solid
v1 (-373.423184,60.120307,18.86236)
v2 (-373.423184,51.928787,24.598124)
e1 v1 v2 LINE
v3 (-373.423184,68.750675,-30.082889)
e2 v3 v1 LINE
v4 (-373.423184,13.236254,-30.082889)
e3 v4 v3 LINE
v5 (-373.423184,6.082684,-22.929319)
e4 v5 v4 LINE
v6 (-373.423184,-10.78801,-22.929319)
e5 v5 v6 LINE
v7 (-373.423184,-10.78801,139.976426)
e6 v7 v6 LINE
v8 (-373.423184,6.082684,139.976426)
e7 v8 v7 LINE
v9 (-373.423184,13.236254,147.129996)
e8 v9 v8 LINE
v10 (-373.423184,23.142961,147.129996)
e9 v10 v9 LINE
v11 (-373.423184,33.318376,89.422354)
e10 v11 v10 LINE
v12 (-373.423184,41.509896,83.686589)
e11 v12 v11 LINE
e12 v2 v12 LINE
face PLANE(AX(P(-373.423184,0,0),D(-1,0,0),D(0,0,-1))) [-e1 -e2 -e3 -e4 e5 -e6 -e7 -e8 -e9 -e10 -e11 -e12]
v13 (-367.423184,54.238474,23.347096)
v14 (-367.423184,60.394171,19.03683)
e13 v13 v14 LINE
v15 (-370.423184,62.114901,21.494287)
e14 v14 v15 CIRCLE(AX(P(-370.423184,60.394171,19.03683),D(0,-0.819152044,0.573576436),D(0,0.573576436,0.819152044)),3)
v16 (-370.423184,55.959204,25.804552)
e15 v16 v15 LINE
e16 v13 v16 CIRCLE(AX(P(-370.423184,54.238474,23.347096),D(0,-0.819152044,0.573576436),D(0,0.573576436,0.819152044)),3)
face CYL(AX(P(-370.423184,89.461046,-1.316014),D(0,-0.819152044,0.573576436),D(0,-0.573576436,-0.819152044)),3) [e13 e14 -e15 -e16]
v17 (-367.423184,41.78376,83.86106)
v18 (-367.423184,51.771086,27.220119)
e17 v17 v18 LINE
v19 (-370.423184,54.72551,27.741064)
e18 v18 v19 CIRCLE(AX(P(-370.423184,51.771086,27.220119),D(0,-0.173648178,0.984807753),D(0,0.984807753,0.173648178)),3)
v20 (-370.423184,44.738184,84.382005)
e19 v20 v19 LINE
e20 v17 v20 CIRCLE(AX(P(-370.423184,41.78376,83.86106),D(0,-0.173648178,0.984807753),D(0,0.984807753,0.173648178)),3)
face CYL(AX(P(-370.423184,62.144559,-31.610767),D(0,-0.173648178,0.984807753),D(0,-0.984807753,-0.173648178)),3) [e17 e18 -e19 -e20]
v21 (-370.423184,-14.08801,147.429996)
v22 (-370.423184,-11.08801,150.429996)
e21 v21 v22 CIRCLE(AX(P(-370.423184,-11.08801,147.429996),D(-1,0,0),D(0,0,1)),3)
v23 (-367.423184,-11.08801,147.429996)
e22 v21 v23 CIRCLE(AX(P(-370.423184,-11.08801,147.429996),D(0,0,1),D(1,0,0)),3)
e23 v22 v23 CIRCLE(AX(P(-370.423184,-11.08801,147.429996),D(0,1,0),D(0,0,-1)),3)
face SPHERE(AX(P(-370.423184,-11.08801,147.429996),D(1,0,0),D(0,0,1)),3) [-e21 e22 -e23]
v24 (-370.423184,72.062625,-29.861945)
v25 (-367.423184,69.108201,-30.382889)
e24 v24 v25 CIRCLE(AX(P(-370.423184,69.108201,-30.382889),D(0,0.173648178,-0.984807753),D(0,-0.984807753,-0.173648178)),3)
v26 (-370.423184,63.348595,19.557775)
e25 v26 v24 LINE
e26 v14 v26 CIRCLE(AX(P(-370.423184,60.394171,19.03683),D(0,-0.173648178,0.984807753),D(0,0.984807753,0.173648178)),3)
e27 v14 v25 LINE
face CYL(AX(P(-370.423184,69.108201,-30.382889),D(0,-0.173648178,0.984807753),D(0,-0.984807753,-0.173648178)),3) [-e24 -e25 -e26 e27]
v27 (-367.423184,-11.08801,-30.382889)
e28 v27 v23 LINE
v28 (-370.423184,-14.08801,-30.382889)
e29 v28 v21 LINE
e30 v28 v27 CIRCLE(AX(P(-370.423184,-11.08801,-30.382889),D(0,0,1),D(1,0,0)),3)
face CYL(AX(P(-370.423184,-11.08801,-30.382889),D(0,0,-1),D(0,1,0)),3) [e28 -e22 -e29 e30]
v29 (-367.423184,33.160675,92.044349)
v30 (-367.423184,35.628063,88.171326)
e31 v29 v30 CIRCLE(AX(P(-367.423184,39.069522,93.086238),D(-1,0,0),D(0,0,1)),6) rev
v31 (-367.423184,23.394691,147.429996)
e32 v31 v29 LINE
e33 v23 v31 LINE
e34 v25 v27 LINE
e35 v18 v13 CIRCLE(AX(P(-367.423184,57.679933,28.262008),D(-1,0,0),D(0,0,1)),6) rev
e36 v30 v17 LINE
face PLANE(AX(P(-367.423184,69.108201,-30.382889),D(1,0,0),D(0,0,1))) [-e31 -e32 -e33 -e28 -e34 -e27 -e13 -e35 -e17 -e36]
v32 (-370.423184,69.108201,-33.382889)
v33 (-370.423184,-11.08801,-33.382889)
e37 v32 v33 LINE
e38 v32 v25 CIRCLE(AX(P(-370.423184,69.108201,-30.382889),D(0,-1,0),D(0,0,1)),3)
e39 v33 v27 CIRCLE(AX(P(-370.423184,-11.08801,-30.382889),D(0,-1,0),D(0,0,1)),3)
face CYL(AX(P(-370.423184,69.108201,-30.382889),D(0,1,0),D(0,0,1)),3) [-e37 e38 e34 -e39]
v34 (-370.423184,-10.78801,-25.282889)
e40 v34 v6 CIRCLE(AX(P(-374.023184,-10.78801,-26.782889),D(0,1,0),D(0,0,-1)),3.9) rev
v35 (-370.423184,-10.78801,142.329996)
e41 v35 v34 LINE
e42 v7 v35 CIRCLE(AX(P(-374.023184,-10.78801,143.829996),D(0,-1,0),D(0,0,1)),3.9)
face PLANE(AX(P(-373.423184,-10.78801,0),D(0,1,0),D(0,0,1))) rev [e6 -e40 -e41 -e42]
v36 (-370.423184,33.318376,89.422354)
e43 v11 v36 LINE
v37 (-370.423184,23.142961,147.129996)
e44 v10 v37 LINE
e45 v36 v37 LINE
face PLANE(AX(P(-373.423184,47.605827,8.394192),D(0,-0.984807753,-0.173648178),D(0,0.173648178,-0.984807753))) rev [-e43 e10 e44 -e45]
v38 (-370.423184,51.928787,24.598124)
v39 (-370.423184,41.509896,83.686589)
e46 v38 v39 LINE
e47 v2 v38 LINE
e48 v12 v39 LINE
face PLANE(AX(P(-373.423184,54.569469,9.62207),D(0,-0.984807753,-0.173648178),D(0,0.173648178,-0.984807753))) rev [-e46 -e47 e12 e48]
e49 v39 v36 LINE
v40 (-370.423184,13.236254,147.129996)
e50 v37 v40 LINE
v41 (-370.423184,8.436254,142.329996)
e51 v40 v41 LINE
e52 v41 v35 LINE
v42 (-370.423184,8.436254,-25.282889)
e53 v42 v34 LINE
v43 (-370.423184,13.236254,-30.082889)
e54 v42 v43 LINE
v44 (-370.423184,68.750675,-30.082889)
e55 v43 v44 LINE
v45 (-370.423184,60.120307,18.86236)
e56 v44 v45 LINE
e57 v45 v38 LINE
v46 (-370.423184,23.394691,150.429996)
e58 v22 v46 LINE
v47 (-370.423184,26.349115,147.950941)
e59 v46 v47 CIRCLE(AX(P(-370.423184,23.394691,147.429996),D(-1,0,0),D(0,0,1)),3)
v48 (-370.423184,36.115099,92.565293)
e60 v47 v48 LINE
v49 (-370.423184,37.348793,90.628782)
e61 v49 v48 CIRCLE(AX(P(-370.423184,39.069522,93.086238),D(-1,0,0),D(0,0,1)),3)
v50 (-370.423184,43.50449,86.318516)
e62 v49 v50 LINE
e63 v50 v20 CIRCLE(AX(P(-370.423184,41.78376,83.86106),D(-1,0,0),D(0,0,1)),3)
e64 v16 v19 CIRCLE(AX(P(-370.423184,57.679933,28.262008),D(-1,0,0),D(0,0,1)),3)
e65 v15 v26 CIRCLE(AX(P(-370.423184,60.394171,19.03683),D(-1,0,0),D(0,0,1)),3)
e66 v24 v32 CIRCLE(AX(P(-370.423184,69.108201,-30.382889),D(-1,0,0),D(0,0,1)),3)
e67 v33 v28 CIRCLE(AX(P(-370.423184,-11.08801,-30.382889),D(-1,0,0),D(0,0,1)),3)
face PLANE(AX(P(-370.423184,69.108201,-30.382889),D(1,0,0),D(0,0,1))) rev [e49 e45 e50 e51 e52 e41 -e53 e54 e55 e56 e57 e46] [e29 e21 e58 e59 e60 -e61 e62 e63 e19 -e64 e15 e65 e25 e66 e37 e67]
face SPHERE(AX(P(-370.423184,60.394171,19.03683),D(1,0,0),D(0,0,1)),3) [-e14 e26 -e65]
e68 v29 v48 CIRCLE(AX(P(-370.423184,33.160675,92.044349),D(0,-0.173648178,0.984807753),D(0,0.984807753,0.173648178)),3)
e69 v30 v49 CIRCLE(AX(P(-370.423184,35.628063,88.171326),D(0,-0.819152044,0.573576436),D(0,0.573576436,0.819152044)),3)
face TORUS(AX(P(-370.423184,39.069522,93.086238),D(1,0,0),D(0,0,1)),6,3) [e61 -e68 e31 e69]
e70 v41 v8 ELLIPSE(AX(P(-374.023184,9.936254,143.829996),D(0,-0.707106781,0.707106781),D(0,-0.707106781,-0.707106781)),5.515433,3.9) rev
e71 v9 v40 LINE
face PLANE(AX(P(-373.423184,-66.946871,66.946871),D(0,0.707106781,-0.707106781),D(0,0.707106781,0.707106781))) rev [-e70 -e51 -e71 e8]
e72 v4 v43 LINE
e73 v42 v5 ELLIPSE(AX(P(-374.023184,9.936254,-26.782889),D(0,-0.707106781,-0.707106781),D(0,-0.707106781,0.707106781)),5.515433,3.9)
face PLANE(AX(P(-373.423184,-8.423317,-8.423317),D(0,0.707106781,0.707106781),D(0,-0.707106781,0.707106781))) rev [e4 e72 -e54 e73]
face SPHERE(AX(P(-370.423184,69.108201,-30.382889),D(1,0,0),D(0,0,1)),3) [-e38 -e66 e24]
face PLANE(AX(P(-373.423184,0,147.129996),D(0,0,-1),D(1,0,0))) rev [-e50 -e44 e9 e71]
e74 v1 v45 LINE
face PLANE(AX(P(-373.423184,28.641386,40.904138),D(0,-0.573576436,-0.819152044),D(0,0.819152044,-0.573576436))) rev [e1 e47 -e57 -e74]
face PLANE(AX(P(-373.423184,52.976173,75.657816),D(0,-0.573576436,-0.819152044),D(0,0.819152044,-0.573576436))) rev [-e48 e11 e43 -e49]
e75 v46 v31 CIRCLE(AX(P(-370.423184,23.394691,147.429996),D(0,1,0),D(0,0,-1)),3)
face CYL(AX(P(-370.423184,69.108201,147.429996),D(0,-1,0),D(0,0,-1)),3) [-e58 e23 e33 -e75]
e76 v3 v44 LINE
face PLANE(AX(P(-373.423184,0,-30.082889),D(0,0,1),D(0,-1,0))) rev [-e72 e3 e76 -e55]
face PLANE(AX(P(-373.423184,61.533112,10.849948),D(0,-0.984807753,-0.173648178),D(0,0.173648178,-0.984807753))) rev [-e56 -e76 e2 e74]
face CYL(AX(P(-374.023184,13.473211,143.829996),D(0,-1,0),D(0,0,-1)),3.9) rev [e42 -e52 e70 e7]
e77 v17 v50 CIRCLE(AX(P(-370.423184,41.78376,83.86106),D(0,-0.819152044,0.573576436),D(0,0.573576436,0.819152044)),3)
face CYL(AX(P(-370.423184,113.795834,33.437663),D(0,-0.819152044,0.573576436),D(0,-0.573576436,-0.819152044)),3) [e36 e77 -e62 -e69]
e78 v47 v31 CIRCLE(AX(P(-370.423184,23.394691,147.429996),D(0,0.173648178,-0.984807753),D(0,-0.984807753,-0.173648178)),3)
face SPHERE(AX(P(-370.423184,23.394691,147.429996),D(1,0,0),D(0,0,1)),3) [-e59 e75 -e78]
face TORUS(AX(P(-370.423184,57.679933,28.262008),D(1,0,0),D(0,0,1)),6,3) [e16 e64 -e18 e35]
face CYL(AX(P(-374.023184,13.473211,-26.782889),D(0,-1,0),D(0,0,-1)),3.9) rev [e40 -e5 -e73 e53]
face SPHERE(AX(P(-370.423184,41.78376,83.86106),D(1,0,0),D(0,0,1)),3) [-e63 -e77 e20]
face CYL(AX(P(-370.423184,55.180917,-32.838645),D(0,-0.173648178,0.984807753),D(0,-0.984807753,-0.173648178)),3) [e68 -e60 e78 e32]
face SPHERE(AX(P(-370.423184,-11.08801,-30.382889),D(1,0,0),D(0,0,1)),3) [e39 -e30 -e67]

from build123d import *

# Parameters (mm, degrees)
BOSS_EXTRUDE1_DEPTH  = 3
FILLET1_R            = 3
BOSS_EXTRUDE2_DEPTH  = 3
CUT_EXTRUDE1_START   = -16.870694295
CUT_EXTRUDE1_DEPTH   = 17.870694295
CUT_EXTRUDE1_START_2 = 6.082684495
CUT_EXTRUDE1_2_DEPTH = 3.553569774
CUT_EXTRUDE1_START_3 = -94.677172909
CUT_EXTRUDE1_3_DEPTH = 3.677172909
CUT_EXTRUDE2_REACH   = 418.489


with BuildPart() as part:
    # Sketch1 → Boss-Extrude1 (new body)
    with BuildSketch(Plane.ZY.offset(376.423184311)):
        with BuildLine():
            Line((-33.382889261, -4.0880098), (-33.382889261, -11.0880098))
            ThreePointArc((-33.382889261, -11.0880098), (-32.504209605, -13.209330144), (-30.382889261, -14.0880098))
            Line((-30.382889261, -14.0880098), (147.429996243, -14.0880098))
            ThreePointArc((147.429996243, -14.0880098), (149.551316587, -13.209330144), (150.429996243, -11.0880098))
            Line((150.429996243, -11.0880098), (150.429996243, -4.0880098))
            Line((150.429996243, -4.0880098), (150.429996243, 23.394691306))
            ThreePointArc((150.429996243, 23.394691306), (149.728129572, 25.323054136), (147.950940776, 26.349114566))
            Line((147.950940776, 26.349114566), (92.565293245, 36.115098569))
            ThreePointArc((92.565293245, 36.115098569), (91.474338953, 36.539347491), (90.628781645, 37.348792519))
            Line((90.628781645, 37.348792519), (86.318516116, 43.504489644))
            ThreePointArc((86.318516116, 43.504489644), (85.472958808, 44.313934672), (84.382004516, 44.738183594))
            Line((84.382004516, 44.738183594), (27.741063701, 54.725509672))
            ThreePointArc((27.741063701, 54.725509672), (26.650109409, 55.149758594), (25.804552101, 55.959203622))
            Line((25.804552101, 55.959203622), (21.494286572, 62.114900747))
            ThreePointArc((21.494286572, 62.114900747), (20.648729264, 62.924345775), (19.557774972, 63.348594697))
            Line((19.557774972, 63.348594697), (-29.861944728, 72.062624659))
            ThreePointArc((-29.861944728, 72.062624659), (-32.31125209, 71.406334729), (-33.382889261, 69.1082014))
            Line((-33.382889261, 69.1082014), (-33.382889261, -4.0880098))
        make_face()
    extrude(amount=BOSS_EXTRUDE1_DEPTH)

    # Fillet1
    fillet1_edges = [part.edges().sort_by_distance(p)[0] for p in [
        (-379.423184311, 67.705609678, -5.152084878),
        (-379.423184311, 62.924345775, 20.648729264),
        (-379.423184311, 59.037052184, 23.649419336),
        (-379.423184311, 55.149758594, 26.650109409),
        (-379.423184311, 49.731846633, 56.061534109),
        (-379.423184311, 44.313934672, 85.472958808),
        (-379.423184311, 40.426641081, 88.473648881),
        (-379.423184311, 36.539347491, 91.474338953),
        (-379.423184311, 31.232106567, 120.258117011),
        (-379.423184311, 25.323054136, 149.728129572),
        (-379.423184311, 6.153340753, 150.429996243),
        (-379.423184311, -13.209330144, 149.551316587),
        (-379.423184311, -14.0880098, 58.523553491),
        (-379.423184311, -13.209330144, -32.504209605),
        (-379.423184311, 29.0100958, -33.382889261),
        (-379.423184311, 71.406334729, -32.31125209),
    ]]
    fillet(fillet1_edges, radius=FILLET1_R - 0.0001)  # a hair under: the kernel refuses the full size

    # Sketch2 → Boss-Extrude2 (add)
    with BuildSketch(Plane(origin=(-376.423184311, 0, 0), x_dir=(0, 0, -1), z_dir=(1, 0, 0))):
        Polygon((-147.129996243, 23.142961417), (-147.129996243, 13.236254269), (-143.529996243, 9.636254269), (-143.529996243, -4.0880098), (-143.529996243, -10.7880098), (26.482889261, -10.7880098), (26.482889261, -4.0880098), (26.482889261, 9.636254269), (30.082889261, 13.236254269), (30.082889261, 68.750675322), (-18.862359767, 60.120307341), (-24.598124131, 51.928786898), (-83.686589311, 41.509896238), (-89.422353675, 33.318375795), align=None)
    extrude(amount=BOSS_EXTRUDE2_DEPTH)

    # Cut-Extrude1: read off the stored shape, not the designer's step
    # Cut-Extrude1 outline → Cut-Extrude1 (cut)
    with BuildSketch(Plane.XZ.offset(10.7880098).offset(CUT_EXTRUDE1_START)):
        with BuildLine():
            Line((-376.423184311, 143.529996243), (-376.423184311, 142.329996243))
            ThreePointArc((-376.423184311, 142.329996243), (-375.230428102, 140.761580148), (-373.423184311, 139.97642647))
            Line((-373.423184311, 139.97642647), (-373.423184311, 143.529996243))
            Line((-373.423184311, 143.529996243), (-376.423184311, 143.529996243))
        make_face()
    extrude(amount=CUT_EXTRUDE1_DEPTH, mode=Mode.SUBTRACT)

    # Cut-Extrude1 2 outline → Cut-Extrude1 2 (cut)
    with BuildSketch(Plane(origin=(0, 0, 0), x_dir=(1, 0, 0), z_dir=(0, 1, 0)).offset(CUT_EXTRUDE1_START_2)):
        with BuildLine():
            ThreePointArc((-373.423184311, -139.97642647), (-375.230428102, -140.761580148), (-376.423184311, -142.329996243))
            Line((-376.423184311, -142.329996243), (-376.423184311, -143.529996243))
            Line((-376.423184311, -143.529996243), (-373.423184311, -143.529996243))
            Line((-373.423184311, -143.529996243), (-373.423184311, -139.97642647))
        make_face()
    extrude(amount=CUT_EXTRUDE1_2_DEPTH, mode=Mode.SUBTRACT)

    # Cut-Extrude1 3 outline → Cut-Extrude1 3 (add)
    with BuildSketch(Plane(origin=(0, 0, 0), x_dir=(1, 0, 0), z_dir=(0, 0.707106781186553, -0.707106781186542)).offset(CUT_EXTRUDE1_START_3)):
        with BuildLine():
            Line((-376.423184311, -106.607838111), (-376.423184311, -113.39606321))
            Line((-376.423184311, -113.39606321), (-373.423184311, -113.39606321))
            Line((-373.423184311, -113.39606321), (-373.423184311, -103.279387817))
            add(Edge.make_bspline(
                [(-373.423184311, -103.279387817), (-375.582623677, -103.754880716), (-376.423184311, -106.607838111)],
                knots=[0.154459598, 0.154459598, 0.154459598, 1.176005207, 1.176005207, 1.176005207], degree=2, weights=[1, 0.872366982, 1]))
        make_face()
    extrude(amount=CUT_EXTRUDE1_3_DEPTH)

    # Cut-Extrude2: up to this plane
    cut_extrude2_end = Plane(origin=(-373.423184311, -8.423317496, -8.423317496), z_dir=(0, 0.7071067811865445, 0.7071067811865507))
    # Sketch3<3> → Cut-Extrude2 (cut, up to the surface)
    with BuildSketch(Plane.XZ.offset(10.7880098), mode=Mode.PRIVATE) as cut_extrude2_sk1:
        with BuildLine():
            Line((-373.423184311, -26.482889261), (-373.423184311, -23.233241391))
            ThreePointArc((-373.423184311, -23.233241391), (-375.473428882, -24.346456682), (-376.410662534, -26.482889261))
            Line((-376.410662534, -26.482889261), (-373.423184311, -26.482889261))
        make_face()
    cut_extrude2_tool1 = split(extrude(cut_extrude2_sk1.sketch, amount=-CUT_EXTRUDE2_REACH, mode=Mode.PRIVATE), bisect_by=cut_extrude2_end, keep=Keep.BOTH, mode=Mode.PRIVATE)
    add(cut_extrude2_tool1.solids().sort_by_distance((-374.649681, -10.78801, -25.160842))[0], mode=Mode.SUBTRACT)
    # Sketch3<3> → Cut-Extrude2 (cut, up to the surface)
    with BuildSketch(Plane.XZ.offset(10.7880098), mode=Mode.PRIVATE) as cut_extrude2_sk2:
        with BuildLine():
            ThreePointArc((-373.473184311, -22.937437402), (-375.250304231, -23.730170981), (-376.423184311, -25.282889261))
            Line((-376.423184311, -25.282889261), (-376.423184311, -26.482889261))
            Line((-376.423184311, -26.482889261), (-376.410662534, -26.482889261))
            ThreePointArc((-376.410662534, -26.482889261), (-375.473428882, -24.346456682), (-373.423184311, -23.233241391))
            Line((-373.423184311, -23.233241391), (-373.423184311, -22.929319487))
            ThreePointArc((-373.423184311, -22.929319487), (-373.448197491, -22.933297266), (-373.473184311, -22.937437402))
        make_face()
    cut_extrude2_tool2 = split(extrude(cut_extrude2_sk2.sketch, amount=-CUT_EXTRUDE2_REACH, mode=Mode.PRIVATE), bisect_by=cut_extrude2_end, keep=Keep.BOTH, mode=Mode.PRIVATE)
    add(cut_extrude2_tool2.solids().sort_by_distance((-373.46969, -10.78801, -23.08128))[0], mode=Mode.SUBTRACT)


with BuildPart() as body_2:
    # Mirror1: mirrored copy
    add(part.part.mirror(Plane(origin=(-373.423184311, 0, 0), x_dir=(0, 0, 1), z_dir=(1, 0, 0))))


solid = body_2.part
